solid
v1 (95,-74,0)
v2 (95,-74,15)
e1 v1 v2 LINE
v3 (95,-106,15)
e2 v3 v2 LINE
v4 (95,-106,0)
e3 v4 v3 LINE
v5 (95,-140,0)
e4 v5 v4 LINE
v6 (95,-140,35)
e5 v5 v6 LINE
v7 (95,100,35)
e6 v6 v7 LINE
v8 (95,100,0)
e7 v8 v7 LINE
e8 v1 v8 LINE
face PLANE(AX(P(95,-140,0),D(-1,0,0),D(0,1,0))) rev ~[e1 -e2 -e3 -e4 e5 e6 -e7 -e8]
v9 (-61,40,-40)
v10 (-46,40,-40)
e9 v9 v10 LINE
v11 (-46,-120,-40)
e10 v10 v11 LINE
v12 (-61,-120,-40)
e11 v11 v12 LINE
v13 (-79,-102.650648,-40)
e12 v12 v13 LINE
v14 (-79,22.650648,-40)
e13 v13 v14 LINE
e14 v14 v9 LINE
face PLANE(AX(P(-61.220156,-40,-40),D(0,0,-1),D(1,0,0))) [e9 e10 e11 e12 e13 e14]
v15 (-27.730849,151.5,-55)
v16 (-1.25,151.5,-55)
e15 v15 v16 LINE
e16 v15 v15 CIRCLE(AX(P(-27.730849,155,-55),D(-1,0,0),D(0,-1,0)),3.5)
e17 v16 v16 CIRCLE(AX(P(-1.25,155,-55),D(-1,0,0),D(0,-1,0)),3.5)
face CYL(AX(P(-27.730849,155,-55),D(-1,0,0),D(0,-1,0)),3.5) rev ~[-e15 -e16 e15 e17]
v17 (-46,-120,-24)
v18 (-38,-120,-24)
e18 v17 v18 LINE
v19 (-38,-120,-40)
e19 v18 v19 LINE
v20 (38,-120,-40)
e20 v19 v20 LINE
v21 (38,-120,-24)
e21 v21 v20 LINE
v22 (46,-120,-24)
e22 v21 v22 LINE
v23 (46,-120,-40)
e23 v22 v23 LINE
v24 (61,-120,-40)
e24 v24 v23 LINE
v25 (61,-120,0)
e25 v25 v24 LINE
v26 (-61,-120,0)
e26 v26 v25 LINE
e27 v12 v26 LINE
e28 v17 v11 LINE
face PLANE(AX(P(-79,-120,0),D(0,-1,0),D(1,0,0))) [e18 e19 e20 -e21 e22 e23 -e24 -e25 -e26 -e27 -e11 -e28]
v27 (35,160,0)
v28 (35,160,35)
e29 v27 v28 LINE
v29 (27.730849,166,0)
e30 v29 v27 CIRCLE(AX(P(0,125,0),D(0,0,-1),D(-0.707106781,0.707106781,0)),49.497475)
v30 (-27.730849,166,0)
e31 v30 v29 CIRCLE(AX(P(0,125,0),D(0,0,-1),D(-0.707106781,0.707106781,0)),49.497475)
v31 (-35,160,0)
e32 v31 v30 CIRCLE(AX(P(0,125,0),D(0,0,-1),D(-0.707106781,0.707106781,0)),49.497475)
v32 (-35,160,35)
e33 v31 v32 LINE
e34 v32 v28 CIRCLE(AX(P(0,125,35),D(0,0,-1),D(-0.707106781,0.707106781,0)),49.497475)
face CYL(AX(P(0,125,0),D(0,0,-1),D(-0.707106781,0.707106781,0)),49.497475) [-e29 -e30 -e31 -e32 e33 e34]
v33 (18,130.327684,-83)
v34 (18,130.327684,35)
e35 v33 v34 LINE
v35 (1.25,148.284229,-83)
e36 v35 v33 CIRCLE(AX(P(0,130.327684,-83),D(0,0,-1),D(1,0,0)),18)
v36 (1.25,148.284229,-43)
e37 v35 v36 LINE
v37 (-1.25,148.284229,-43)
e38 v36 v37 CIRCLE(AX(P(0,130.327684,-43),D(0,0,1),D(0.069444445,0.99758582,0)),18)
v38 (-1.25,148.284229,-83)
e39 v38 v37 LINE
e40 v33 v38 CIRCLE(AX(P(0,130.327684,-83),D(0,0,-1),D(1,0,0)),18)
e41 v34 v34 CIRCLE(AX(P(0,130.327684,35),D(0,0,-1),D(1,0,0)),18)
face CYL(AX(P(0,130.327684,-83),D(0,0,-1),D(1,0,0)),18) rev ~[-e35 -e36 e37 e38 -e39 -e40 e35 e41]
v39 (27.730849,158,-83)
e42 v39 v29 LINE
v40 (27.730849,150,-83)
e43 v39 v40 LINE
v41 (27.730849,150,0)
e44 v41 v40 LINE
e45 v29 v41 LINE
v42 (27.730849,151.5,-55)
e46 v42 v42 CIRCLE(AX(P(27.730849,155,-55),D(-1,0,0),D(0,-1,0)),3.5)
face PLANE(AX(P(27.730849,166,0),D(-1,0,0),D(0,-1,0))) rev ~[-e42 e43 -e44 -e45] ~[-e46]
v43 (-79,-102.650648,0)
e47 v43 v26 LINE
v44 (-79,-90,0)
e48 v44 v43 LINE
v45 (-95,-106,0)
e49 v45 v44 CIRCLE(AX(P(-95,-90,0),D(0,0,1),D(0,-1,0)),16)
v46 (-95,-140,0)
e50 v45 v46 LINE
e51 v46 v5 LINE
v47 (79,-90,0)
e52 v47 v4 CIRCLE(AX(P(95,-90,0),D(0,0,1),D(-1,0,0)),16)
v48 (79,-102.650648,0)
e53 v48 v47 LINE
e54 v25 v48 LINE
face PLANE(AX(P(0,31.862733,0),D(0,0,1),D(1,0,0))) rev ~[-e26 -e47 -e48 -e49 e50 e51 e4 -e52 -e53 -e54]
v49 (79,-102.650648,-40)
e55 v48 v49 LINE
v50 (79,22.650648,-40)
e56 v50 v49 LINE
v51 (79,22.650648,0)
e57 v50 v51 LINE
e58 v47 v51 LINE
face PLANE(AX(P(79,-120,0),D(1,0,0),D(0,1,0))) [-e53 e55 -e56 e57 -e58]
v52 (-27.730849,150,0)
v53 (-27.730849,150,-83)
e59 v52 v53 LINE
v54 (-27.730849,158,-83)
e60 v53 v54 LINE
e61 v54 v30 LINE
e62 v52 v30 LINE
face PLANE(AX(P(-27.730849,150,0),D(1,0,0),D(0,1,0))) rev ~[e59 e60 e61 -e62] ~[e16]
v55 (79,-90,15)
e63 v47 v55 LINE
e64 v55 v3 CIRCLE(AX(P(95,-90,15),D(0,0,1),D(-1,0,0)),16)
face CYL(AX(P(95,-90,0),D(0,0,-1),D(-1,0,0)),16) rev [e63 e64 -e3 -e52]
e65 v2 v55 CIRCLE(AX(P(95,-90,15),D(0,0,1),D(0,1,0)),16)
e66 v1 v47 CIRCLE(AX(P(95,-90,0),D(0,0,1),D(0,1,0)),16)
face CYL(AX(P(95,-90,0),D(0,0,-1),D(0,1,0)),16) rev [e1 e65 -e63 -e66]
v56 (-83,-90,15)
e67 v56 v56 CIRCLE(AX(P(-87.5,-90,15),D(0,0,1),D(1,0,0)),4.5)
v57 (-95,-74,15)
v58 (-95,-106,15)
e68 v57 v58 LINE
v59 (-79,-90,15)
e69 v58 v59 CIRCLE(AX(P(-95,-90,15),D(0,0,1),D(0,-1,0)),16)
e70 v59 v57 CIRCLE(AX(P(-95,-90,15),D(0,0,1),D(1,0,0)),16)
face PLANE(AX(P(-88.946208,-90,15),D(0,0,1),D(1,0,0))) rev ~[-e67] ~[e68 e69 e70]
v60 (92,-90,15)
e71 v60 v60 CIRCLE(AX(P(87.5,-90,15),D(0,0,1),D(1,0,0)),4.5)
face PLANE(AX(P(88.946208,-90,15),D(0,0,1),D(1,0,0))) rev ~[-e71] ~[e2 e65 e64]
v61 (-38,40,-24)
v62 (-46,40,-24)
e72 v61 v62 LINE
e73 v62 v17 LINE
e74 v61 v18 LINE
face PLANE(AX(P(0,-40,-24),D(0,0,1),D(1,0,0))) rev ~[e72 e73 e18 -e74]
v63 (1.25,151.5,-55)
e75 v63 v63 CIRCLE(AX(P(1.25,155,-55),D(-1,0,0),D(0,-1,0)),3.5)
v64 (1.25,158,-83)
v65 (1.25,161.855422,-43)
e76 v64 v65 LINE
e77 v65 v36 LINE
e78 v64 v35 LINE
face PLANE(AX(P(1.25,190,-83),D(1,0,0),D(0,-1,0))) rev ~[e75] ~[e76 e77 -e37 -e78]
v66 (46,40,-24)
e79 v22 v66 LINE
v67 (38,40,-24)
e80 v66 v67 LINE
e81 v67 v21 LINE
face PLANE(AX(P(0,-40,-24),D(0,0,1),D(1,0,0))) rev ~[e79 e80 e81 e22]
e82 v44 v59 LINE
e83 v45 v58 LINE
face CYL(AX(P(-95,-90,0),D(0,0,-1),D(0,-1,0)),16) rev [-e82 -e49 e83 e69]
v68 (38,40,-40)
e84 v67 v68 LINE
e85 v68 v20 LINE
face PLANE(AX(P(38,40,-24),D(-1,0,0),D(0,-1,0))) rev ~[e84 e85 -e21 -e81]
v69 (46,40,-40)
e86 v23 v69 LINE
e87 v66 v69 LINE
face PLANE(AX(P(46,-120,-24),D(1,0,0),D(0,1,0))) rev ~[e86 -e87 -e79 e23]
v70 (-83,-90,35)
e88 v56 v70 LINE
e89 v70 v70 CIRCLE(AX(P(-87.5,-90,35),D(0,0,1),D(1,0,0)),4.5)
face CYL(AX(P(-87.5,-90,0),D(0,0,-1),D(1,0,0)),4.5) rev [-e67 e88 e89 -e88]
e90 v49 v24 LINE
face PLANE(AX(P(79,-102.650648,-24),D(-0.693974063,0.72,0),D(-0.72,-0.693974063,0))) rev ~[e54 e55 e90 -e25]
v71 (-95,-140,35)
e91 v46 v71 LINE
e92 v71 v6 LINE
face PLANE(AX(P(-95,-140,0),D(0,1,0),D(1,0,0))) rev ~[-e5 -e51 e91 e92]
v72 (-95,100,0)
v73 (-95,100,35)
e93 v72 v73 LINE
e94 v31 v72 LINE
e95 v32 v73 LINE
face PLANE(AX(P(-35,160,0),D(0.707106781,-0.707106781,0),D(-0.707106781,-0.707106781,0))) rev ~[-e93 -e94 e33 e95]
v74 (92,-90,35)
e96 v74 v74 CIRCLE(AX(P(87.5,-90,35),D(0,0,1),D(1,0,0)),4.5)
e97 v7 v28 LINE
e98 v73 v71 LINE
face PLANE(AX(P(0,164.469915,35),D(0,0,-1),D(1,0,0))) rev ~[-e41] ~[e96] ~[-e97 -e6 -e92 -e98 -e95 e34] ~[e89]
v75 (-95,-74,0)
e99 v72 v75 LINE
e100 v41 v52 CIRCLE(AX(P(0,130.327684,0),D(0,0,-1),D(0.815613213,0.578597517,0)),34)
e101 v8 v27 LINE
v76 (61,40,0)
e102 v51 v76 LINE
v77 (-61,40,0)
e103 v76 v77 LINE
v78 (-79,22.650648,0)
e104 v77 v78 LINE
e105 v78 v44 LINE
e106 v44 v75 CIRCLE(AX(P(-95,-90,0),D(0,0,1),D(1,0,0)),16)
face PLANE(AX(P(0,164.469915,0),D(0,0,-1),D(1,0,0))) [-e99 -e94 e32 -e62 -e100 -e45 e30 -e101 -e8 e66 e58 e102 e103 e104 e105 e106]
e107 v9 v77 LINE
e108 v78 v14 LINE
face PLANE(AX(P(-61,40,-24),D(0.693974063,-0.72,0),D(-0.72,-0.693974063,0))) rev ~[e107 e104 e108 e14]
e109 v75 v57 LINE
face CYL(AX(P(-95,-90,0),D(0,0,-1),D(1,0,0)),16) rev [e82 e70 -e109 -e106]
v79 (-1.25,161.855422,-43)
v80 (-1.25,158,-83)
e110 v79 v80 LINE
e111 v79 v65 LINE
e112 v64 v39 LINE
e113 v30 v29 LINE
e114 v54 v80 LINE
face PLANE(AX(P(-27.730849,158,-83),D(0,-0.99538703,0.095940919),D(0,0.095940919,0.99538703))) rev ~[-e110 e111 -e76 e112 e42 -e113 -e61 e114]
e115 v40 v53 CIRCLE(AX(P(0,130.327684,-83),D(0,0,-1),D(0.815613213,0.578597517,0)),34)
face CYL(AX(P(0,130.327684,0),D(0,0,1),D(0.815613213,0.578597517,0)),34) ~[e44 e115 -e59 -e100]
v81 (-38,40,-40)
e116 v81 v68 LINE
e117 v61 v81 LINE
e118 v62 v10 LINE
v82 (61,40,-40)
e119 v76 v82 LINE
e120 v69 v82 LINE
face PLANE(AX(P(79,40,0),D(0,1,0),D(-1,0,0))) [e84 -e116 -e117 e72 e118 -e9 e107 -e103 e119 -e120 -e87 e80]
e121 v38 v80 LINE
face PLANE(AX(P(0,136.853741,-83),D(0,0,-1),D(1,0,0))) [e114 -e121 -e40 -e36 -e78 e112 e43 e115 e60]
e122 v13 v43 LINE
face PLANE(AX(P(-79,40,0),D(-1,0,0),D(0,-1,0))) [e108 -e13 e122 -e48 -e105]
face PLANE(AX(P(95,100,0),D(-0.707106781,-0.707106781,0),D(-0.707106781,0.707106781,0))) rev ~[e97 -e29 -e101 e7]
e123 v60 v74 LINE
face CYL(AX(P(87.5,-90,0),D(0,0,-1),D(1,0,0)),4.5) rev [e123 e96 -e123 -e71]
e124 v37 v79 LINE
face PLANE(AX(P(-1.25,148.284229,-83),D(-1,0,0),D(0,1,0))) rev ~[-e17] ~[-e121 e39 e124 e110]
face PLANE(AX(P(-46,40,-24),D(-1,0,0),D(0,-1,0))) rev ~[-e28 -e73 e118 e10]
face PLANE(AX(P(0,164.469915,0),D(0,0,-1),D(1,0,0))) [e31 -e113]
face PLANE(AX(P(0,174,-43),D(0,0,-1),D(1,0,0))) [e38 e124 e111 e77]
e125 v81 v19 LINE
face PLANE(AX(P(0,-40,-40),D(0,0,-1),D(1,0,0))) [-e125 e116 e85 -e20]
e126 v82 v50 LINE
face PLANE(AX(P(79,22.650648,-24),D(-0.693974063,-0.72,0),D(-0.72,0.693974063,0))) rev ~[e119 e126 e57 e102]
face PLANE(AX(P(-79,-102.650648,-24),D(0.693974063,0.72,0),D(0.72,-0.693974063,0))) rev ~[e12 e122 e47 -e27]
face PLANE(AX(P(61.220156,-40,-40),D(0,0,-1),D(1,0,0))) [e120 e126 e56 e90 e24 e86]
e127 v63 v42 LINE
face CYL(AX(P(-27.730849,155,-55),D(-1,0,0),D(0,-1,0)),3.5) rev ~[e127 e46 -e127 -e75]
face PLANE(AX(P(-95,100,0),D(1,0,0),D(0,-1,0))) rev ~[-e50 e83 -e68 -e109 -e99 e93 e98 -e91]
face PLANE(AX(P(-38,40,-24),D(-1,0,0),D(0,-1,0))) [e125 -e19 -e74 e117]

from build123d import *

# Parameters (mm, degrees)
F0_R      = 4.5
F1_DEPTH  = 35
F2_DEPTH  = 24
F3_DEPTH  = 15
F5_DEPTH  = 35
F7_DEPTH  = 83
F9_DEPTH  = 290
F10_R     = 18
F11_DEPTH = 199
F12_W     = 2.5
F12_H     = 32
F13_DEPTH = 40
F8_R      = 3.5
F14_DEPTH = 99.1
F15_W     = 76
F15_H     = 160
F16_DEPTH = 16
F17_DEPTH = 24


# Not quite as in the source:
# - a feature names something its author has since deleted; it is built from what else it names


with BuildPart() as f1:
    # F0 (on Top) → F1 (new body)
    with BuildSketch(Plane.XY):
        with BuildLine():
            Line((95, 100), (35, 160))
            Line((35, 160), (-35, 160))
            Line((-35, 160), (-95, 100))
            Line((-95, 100), (-95, -74))
            ThreePointArc((-95, -74), (-83.686291501, -78.686291501), (-79, -90))
            Line((-79, -90), (-79, 40))
            Line((-79, 40), (79, 40))
            Line((79, 40), (79, -90))
            ThreePointArc((79, -90), (83.686291501, -78.686291501), (95, -74))
            Line((95, -74), (95, 100))
        make_face()
        with BuildLine():
            Line((95, -140), (95, -106))
            ThreePointArc((95, -106), (83.686291501, -101.313708499), (79, -90))
            Line((79, -90), (79, -120))
            Line((79, -120), (-79, -120))
            Line((-79, -120), (-79, -90))
            ThreePointArc((-79, -90), (-83.686291501, -101.313708499), (-95, -106))
            Line((-95, -106), (-95, -140))
            Line((-95, -140), (95, -140))
        make_face()
        with BuildLine():
            ThreePointArc((-79, -90), (-83.686291501, -78.686291501), (-95, -74))
            Line((-95, -74), (-95, -106))
            ThreePointArc((-95, -106), (-83.686291501, -101.313708499), (-79, -90))
        make_face()
        with Locations((-87.5, -90)):
            Circle(F0_R, mode=Mode.SUBTRACT)
        with BuildLine():
            Line((95, -106), (95, -74))
            ThreePointArc((95, -74), (83.686291501, -78.686291501), (79, -90))
            ThreePointArc((79, -90), (83.686291501, -101.313708499), (95, -106))
        make_face()
        with Locations((87.5, -90)):
            Circle(F0_R, mode=Mode.SUBTRACT)
        Polygon((79, -120), (79, -90), (79, 40), (-79, 40), (-79, -90), (-79, -120), align=None)
    extrude(amount=F1_DEPTH)

    # F0 (on Top) → F2 (join)
    with BuildSketch(Plane.XY):
        Polygon((79, -120), (79, -90), (79, 40), (-79, 40), (-79, -90), (-79, -120), align=None)
    extrude(amount=-F2_DEPTH)

    # F0 (on Top) → F3 (cut)
    with BuildSketch(Plane.XY):
        with BuildLine():
            ThreePointArc((-79, -90), (-83.686291501, -78.686291501), (-95, -74))
            Line((-95, -74), (-95, -106))
            ThreePointArc((-95, -106), (-83.686291501, -101.313708499), (-79, -90))
        make_face()
        with Locations((-87.5, -90)):
            Circle(F0_R, mode=Mode.SUBTRACT)
        with BuildLine():
            Line((95, -106), (95, -74))
            ThreePointArc((95, -74), (83.686291501, -78.686291501), (79, -90))
            ThreePointArc((79, -90), (83.686291501, -101.313708499), (95, -106))
        make_face()
        with Locations((87.5, -90)):
            Circle(F0_R, mode=Mode.SUBTRACT)
    extrude(amount=F3_DEPTH, mode=Mode.SUBTRACT)

    # F4 (on face) → F5 (join)
    with BuildSketch(Plane(origin=(0, 0, 0), x_dir=(1, 0, 0), z_dir=(0, 0, -1))):
        with BuildLine():
            Line((35, -160), (-35, -160))
            ThreePointArc((-35, -160), (0, -174.4974746831), (35, -160))
        make_face()
    extrude(amount=-F5_DEPTH)

    # F6 (on face) → F7 (join)
    with BuildSketch(Plane(origin=(0, 0, 0), x_dir=(1, 0, 0), z_dir=(0, 0, -1))):
        with BuildLine():
            Line((-27.7308492477, -166), (27.7308492477, -166))
            Line((27.7308492477, -166), (27.7308492477, -150))
            ThreePointArc((27.7308492477, -150), (0, -96.3276844271), (-27.7308492477, -150))
            Line((-27.7308492477, -150), (-27.7308492477, -166))
        make_face()
    extrude(amount=F7_DEPTH)

    # F8 (on face) → F9 (cut)
    with BuildSketch(Plane(origin=(-27.7308492477, 0, 0), x_dir=(0, -1, 0), z_dir=(-1, 0, 0))):
        Polygon((-158, -83), (-166, 0), (-166, -83), align=None)
    extrude(amount=-F9_DEPTH, mode=Mode.SUBTRACT)

    # F10 (on face) → F11 (cut)
    with BuildSketch(Plane(origin=(0, 0, -83), x_dir=(1, 0, 0), z_dir=(0, 0, -1))):
        with Locations((0, -130.3276844271)):
            Circle(F10_R)
    extrude(amount=-F11_DEPTH, mode=Mode.SUBTRACT)

    # F12 (on face) → F13 (cut)
    with BuildSketch(Plane(origin=(0, 0, -83), x_dir=(1, 0, 0), z_dir=(0, 0, -1))):
        with Locations((0, -174)):
            Rectangle(F12_W, F12_H)
        with BuildLine():
            ThreePointArc((1.25, -148.2842291949), (0, -148.3276844271), (-1.25, -148.2842291949))
            Line((-1.25, -148.2842291949), (-1.25, -158))
            Line((-1.25, -158), (1.25, -158))
            Line((1.25, -158), (1.25, -148.2842291949))
        make_face()
    extrude(amount=-F13_DEPTH, mode=Mode.SUBTRACT)

    # F8 (on face) → F14 (cut)
    with BuildSketch(Plane(origin=(-27.7308492477, 0, 0), x_dir=(0, -1, 0), z_dir=(-1, 0, 0))):
        with Locations((-155, -55)):
            Circle(F8_R)
    extrude(amount=-F14_DEPTH, mode=Mode.SUBTRACT)

    # F15 (on face) → F16 (join)
    with BuildSketch(Plane(origin=(0, 0, -24), x_dir=(1, 0, 0), z_dir=(0, 0, -1))):
        Polygon((-46, -40), (-46, 120), (-61, 120), (-79, 102.6506484271), (-79, -22.6506484271), (-61, -40), align=None)
        with Locations((0, 40)):
            Rectangle(F15_W, F15_H)
        Polygon((61, 120), (46, 120), (46, -40), (61, -40), (79, -22.6506484271), (79, 102.6506484271), align=None)
    extrude(amount=F16_DEPTH)

    # F15 (on face) → F17 (cut)
    with BuildSketch(Plane(origin=(0, 0, -24), x_dir=(1, 0, 0), z_dir=(0, 0, -1))):
        Polygon((-79, -40), (-61, -40), (-79, -22.6506484271), align=None)
        Polygon((-79, 102.6506484271), (-61, 120), (-79, 120), align=None)
        Polygon((79, 120), (61, 120), (79, 102.6506484271), align=None)
        Polygon((79, -22.6506484271), (61, -40), (79, -40), align=None)
    extrude(amount=-F17_DEPTH, mode=Mode.SUBTRACT)


solid = f1.part
